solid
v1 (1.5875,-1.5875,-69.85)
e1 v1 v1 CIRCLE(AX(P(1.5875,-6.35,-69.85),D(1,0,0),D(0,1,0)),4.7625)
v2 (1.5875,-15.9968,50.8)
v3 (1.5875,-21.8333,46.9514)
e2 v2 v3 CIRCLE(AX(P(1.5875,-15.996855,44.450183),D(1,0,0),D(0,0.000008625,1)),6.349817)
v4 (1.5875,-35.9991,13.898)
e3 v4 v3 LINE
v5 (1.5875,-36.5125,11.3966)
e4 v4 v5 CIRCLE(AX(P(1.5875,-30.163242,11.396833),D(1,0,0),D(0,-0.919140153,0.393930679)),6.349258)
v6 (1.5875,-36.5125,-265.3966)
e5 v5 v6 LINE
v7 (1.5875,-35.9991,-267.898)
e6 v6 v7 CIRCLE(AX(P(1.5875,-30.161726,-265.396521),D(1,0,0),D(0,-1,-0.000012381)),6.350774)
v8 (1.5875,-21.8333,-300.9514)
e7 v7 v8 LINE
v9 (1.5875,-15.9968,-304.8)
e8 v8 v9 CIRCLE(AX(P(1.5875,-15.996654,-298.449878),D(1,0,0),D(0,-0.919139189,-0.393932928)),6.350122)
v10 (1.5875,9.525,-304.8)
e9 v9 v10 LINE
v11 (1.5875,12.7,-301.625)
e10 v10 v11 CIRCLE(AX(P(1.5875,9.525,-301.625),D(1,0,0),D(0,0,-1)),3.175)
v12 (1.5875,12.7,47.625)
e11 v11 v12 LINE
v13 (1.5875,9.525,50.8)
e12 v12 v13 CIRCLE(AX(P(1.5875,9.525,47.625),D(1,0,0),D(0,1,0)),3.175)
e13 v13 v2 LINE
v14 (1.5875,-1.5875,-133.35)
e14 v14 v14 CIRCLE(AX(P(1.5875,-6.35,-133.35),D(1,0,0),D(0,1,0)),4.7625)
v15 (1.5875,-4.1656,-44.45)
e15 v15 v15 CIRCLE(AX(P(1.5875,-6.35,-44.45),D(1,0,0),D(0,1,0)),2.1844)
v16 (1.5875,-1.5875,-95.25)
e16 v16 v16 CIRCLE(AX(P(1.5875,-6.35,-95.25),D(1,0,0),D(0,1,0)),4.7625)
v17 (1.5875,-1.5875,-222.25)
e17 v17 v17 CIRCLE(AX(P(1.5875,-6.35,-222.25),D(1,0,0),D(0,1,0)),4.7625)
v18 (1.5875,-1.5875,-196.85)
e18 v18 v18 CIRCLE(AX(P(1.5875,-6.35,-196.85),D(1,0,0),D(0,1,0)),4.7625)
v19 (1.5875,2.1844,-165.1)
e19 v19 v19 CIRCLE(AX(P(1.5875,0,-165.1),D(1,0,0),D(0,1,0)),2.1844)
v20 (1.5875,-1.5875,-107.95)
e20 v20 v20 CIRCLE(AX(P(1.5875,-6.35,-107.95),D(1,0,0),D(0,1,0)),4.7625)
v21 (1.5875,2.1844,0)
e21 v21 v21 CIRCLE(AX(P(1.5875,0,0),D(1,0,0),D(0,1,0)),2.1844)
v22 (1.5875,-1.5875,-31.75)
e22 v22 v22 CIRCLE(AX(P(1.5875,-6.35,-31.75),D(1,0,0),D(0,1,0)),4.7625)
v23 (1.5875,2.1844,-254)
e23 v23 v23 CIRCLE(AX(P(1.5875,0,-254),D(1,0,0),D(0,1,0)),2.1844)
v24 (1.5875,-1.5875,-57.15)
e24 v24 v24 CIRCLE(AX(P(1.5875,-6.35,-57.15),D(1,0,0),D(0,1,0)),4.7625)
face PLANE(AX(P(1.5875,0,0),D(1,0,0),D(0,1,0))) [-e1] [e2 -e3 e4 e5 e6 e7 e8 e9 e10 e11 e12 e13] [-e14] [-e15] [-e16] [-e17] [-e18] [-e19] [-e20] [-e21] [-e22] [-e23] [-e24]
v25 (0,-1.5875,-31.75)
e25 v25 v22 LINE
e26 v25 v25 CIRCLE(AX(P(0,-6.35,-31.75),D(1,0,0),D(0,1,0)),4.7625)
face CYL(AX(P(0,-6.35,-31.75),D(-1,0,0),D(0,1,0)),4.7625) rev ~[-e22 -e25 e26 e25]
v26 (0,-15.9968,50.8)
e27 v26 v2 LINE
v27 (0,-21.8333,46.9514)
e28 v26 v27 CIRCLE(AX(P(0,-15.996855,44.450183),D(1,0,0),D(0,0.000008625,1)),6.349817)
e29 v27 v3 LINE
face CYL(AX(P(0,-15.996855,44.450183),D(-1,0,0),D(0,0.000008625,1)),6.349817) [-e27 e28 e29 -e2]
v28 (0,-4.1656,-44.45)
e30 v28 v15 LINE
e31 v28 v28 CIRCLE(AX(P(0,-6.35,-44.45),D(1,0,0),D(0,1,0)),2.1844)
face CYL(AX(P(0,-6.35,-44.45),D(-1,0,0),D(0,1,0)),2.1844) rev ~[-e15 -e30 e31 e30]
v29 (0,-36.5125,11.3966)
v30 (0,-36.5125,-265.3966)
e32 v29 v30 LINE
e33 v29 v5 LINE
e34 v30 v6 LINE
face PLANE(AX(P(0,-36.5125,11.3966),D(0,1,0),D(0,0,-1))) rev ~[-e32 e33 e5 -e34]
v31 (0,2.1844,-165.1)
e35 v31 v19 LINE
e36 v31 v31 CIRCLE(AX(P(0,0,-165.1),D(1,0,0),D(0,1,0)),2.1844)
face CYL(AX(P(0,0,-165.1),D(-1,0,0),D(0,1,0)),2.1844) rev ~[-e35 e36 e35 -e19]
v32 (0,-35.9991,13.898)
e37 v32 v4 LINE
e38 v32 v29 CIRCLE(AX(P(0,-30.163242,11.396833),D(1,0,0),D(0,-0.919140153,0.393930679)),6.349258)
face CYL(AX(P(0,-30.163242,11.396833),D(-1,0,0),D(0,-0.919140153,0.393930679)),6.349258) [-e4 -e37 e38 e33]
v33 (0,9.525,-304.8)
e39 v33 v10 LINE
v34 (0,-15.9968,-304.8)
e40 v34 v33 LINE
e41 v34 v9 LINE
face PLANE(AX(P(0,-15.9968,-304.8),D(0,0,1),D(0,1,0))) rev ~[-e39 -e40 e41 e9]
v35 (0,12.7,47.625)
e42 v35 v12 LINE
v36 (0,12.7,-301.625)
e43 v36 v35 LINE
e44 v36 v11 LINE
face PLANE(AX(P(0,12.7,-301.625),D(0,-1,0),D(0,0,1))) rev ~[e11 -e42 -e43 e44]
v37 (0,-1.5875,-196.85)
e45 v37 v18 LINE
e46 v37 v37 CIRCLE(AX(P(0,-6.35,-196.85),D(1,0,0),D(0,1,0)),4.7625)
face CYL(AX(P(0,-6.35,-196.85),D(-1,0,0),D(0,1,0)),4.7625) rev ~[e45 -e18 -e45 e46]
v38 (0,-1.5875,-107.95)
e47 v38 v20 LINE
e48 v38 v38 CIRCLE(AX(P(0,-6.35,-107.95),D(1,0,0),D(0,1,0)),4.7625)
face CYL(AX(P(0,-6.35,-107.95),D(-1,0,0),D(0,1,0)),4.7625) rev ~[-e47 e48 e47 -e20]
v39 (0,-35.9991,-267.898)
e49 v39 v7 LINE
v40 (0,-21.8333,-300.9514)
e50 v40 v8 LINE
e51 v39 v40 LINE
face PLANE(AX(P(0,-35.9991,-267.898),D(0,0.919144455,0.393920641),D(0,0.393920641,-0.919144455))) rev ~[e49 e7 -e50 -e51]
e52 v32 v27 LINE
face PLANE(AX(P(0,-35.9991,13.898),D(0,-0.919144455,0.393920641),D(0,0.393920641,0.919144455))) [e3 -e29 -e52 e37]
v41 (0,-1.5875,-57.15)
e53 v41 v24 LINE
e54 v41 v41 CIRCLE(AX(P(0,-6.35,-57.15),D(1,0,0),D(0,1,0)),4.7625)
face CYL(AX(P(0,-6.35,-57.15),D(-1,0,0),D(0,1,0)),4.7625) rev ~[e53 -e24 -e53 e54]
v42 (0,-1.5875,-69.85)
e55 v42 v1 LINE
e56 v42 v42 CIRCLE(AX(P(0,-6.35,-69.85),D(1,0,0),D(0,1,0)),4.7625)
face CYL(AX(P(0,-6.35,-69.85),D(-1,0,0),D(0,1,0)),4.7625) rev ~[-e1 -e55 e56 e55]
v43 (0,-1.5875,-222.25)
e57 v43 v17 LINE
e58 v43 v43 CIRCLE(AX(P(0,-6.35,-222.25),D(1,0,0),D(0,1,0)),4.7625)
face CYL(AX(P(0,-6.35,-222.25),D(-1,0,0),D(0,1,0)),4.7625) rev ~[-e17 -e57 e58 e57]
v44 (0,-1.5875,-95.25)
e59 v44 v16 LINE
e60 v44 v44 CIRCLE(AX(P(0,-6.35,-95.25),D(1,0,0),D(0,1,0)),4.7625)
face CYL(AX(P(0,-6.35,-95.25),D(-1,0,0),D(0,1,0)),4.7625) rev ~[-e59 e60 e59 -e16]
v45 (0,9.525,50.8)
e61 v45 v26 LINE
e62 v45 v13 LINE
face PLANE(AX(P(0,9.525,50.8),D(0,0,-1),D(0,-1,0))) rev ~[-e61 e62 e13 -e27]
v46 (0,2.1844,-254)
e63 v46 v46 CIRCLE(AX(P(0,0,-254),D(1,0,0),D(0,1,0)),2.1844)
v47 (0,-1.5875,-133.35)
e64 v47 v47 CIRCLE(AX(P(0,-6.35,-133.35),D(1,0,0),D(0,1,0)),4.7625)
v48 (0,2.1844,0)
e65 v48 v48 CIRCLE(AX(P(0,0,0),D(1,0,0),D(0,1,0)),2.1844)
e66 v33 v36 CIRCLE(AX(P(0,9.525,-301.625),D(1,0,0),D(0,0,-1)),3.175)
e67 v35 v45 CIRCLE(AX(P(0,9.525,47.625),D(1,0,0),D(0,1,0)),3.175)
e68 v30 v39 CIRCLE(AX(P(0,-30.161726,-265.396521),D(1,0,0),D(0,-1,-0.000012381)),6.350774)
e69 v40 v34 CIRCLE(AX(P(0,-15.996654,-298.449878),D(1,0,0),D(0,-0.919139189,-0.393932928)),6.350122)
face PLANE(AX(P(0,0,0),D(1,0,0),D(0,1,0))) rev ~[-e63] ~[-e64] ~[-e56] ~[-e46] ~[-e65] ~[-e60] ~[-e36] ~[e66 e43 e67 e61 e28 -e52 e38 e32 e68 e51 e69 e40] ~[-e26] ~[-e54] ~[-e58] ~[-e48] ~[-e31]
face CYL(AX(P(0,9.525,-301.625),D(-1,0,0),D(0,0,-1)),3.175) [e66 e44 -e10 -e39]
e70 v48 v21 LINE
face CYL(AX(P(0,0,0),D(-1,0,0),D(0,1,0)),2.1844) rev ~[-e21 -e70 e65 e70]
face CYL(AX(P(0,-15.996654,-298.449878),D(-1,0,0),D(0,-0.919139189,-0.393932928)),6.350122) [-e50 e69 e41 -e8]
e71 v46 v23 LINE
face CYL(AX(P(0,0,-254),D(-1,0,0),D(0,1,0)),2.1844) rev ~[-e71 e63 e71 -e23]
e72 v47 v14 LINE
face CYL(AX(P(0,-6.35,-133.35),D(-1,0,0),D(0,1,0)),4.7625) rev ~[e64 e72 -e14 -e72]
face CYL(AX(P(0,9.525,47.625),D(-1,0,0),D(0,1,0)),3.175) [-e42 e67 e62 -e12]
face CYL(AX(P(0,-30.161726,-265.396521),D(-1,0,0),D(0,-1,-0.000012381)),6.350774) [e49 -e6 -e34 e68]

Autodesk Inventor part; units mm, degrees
ref_plane "YZ Plane" through (0, 0, 0) normal (1, 0, 0) x (0, 1, 0)
ref_plane "XZ Plane" through (0, 0, 0) normal (0, 1, 0) x (-1, 0, 0)
ref_plane "XY Plane" through (0, 0, 0) normal (0, 0, 1) x (1, 0, 0)
sketch "skirt" plane through (0, 0, 0) normal (0, 0, 1) x (1, 0, 0)
  circle A0 centre (5.0031, 25.9038) radius 4.7625
  line L0 (24.0531, -167.7712) -> (24.0531, 181.4788)
  line L1 (-25.1594, 145.2504) -> (-25.1594, -131.5428)
  circle A1 centre (11.3531, 133.8538) radius 2.1844
  arc A2 (24.0531, 181.4788) -> (20.8781, 184.6538) centre (20.8781, 181.4788) ccw
  line L2 (20.8781, 184.6538) -> (-4.6437, 184.6538)
  line L3 (-24.646, 147.7518) -> (-10.4803, 180.8052)
  arc A3 (-4.6437, 184.6538) -> (-10.4803, 180.8052) centre (-4.6437, 178.3038) ccw
  arc A4 (-24.646, 147.7518) -> (-25.1594, 145.2504) centre (-18.8094, 145.2504) ccw
  line L4 (-24.646, -134.0442) -> (-10.4803, -167.0976)
  line L5 (-4.6437, -170.9462) -> (20.8781, -170.9462)
  arc A5 (20.8781, -170.9462) -> (24.0531, -167.7712) centre (20.8781, -167.7712) ccw
  arc A6 (-25.1594, -131.5428) -> (-24.646, -134.0442) centre (-18.8094, -131.5428) ccw
  circle A7 centre (11.3531, -120.1462) radius 2.1844
  arc A8 (-10.4803, -167.0976) -> (-4.6437, -170.9462) centre (-4.6437, -164.5962) ccw
  circle A9 centre (5.0031, 102.1038) radius 4.7625
  circle A10 centre (5.0031, 76.7038) radius 4.7625
  circle A11 centre (5.0031, 64.0038) radius 4.7625
  circle A12 centre (5.0031, 38.6038) radius 4.7625
  circle A13 centre (5.0031, 0.5038) radius 4.7625
  circle A14 centre (11.3531, -31.2462) radius 2.1844
  circle A15 centre (5.0031, -62.9962) radius 4.7625
  circle A16 centre (5.0031, -88.3962) radius 4.7625
  circle A17 centre (5.0031, 89.4038) radius 2.1844
  point P0 (-0.9322, -0.2017)
  point P1 (5.0031, 51.3038)
  point P2 (-25.1594, 146.5538)
  point P3 (-25.1594, -132.8462)
  point P4 (5.0031, -12.1962)
  point P5 (5.0031, 13.2038)
  dimension "d0" = 279.4
  dimension "d1" = 49.2125
  dimension "d2" = 3.175
  dimension "d3" = 113.199
  dimension "d4" = 113.199
  dimension "d5" = 6.35
  dimension "d7" = 9.525
  dimension "d13" = 50.8
  dimension "d14" = 50.8
  dimension "d15" = 9.525
  dimension "d16" = 4.3688
  dimension "d17" = 31.75
  dimension "d18" = 4.3688
sketch "Sketch1" plane through (0, 0, 0) normal (1, 0, 0) x (0, 1, 0)
  circle A0 centre (-6.35, -107.95) radius 4.7625
  line L0 (12.7, -301.625) -> (12.7, 47.625)
  line L1 (-36.5125, 11.3966) -> (-36.5125, -265.3966)
  circle A1 centre (0, 0) radius 2.1844
  arc A2 (12.7, 47.625) -> (9.525, 50.8) centre (9.525, 47.625) ccw
  line L2 (9.525, 50.8) -> (-15.9968, 50.8)
  line L3 (-35.9991, 13.898) -> (-21.8333, 46.9514)
  arc A3 (-15.9968, 50.8) -> (-21.8333, 46.9514) centre (-15.9968, 44.45) ccw
  arc A4 (-35.9991, 13.898) -> (-36.5125, 11.3966) centre (-30.1625, 11.3966) ccw
  line L4 (-35.9991, -267.898) -> (-21.8333, -300.9514)
  line L5 (-15.9968, -304.8) -> (9.525, -304.8)
  arc A5 (9.525, -304.8) -> (12.7, -301.625) centre (9.525, -301.625) ccw
  arc A6 (-36.5125, -265.3966) -> (-35.9991, -267.898) centre (-30.1625, -265.3966) ccw
  circle A7 centre (0, -254) radius 2.1844
  arc A8 (-21.8333, -300.9514) -> (-15.9968, -304.8) centre (-15.9968, -298.45) ccw
  circle A9 centre (-6.35, -31.75) radius 4.7625
  circle A10 centre (-6.35, -57.15) radius 4.7625
  circle A11 centre (-6.35, -69.85) radius 4.7625
  circle A12 centre (-6.35, -95.25) radius 4.7625
  circle A13 centre (-6.35, -133.35) radius 4.7625
  circle A14 centre (0, -165.1) radius 2.1844
  circle A15 centre (-6.35, -196.85) radius 4.7625
  circle A16 centre (-6.35, -222.25) radius 4.7625
  circle A17 centre (-6.35, -44.45) radius 2.1844
extrude "Extrusion1" add sketch "Sketch1" along normal blind 1.5875
properties part number "Skirt" material "Acetal Resin, White"
